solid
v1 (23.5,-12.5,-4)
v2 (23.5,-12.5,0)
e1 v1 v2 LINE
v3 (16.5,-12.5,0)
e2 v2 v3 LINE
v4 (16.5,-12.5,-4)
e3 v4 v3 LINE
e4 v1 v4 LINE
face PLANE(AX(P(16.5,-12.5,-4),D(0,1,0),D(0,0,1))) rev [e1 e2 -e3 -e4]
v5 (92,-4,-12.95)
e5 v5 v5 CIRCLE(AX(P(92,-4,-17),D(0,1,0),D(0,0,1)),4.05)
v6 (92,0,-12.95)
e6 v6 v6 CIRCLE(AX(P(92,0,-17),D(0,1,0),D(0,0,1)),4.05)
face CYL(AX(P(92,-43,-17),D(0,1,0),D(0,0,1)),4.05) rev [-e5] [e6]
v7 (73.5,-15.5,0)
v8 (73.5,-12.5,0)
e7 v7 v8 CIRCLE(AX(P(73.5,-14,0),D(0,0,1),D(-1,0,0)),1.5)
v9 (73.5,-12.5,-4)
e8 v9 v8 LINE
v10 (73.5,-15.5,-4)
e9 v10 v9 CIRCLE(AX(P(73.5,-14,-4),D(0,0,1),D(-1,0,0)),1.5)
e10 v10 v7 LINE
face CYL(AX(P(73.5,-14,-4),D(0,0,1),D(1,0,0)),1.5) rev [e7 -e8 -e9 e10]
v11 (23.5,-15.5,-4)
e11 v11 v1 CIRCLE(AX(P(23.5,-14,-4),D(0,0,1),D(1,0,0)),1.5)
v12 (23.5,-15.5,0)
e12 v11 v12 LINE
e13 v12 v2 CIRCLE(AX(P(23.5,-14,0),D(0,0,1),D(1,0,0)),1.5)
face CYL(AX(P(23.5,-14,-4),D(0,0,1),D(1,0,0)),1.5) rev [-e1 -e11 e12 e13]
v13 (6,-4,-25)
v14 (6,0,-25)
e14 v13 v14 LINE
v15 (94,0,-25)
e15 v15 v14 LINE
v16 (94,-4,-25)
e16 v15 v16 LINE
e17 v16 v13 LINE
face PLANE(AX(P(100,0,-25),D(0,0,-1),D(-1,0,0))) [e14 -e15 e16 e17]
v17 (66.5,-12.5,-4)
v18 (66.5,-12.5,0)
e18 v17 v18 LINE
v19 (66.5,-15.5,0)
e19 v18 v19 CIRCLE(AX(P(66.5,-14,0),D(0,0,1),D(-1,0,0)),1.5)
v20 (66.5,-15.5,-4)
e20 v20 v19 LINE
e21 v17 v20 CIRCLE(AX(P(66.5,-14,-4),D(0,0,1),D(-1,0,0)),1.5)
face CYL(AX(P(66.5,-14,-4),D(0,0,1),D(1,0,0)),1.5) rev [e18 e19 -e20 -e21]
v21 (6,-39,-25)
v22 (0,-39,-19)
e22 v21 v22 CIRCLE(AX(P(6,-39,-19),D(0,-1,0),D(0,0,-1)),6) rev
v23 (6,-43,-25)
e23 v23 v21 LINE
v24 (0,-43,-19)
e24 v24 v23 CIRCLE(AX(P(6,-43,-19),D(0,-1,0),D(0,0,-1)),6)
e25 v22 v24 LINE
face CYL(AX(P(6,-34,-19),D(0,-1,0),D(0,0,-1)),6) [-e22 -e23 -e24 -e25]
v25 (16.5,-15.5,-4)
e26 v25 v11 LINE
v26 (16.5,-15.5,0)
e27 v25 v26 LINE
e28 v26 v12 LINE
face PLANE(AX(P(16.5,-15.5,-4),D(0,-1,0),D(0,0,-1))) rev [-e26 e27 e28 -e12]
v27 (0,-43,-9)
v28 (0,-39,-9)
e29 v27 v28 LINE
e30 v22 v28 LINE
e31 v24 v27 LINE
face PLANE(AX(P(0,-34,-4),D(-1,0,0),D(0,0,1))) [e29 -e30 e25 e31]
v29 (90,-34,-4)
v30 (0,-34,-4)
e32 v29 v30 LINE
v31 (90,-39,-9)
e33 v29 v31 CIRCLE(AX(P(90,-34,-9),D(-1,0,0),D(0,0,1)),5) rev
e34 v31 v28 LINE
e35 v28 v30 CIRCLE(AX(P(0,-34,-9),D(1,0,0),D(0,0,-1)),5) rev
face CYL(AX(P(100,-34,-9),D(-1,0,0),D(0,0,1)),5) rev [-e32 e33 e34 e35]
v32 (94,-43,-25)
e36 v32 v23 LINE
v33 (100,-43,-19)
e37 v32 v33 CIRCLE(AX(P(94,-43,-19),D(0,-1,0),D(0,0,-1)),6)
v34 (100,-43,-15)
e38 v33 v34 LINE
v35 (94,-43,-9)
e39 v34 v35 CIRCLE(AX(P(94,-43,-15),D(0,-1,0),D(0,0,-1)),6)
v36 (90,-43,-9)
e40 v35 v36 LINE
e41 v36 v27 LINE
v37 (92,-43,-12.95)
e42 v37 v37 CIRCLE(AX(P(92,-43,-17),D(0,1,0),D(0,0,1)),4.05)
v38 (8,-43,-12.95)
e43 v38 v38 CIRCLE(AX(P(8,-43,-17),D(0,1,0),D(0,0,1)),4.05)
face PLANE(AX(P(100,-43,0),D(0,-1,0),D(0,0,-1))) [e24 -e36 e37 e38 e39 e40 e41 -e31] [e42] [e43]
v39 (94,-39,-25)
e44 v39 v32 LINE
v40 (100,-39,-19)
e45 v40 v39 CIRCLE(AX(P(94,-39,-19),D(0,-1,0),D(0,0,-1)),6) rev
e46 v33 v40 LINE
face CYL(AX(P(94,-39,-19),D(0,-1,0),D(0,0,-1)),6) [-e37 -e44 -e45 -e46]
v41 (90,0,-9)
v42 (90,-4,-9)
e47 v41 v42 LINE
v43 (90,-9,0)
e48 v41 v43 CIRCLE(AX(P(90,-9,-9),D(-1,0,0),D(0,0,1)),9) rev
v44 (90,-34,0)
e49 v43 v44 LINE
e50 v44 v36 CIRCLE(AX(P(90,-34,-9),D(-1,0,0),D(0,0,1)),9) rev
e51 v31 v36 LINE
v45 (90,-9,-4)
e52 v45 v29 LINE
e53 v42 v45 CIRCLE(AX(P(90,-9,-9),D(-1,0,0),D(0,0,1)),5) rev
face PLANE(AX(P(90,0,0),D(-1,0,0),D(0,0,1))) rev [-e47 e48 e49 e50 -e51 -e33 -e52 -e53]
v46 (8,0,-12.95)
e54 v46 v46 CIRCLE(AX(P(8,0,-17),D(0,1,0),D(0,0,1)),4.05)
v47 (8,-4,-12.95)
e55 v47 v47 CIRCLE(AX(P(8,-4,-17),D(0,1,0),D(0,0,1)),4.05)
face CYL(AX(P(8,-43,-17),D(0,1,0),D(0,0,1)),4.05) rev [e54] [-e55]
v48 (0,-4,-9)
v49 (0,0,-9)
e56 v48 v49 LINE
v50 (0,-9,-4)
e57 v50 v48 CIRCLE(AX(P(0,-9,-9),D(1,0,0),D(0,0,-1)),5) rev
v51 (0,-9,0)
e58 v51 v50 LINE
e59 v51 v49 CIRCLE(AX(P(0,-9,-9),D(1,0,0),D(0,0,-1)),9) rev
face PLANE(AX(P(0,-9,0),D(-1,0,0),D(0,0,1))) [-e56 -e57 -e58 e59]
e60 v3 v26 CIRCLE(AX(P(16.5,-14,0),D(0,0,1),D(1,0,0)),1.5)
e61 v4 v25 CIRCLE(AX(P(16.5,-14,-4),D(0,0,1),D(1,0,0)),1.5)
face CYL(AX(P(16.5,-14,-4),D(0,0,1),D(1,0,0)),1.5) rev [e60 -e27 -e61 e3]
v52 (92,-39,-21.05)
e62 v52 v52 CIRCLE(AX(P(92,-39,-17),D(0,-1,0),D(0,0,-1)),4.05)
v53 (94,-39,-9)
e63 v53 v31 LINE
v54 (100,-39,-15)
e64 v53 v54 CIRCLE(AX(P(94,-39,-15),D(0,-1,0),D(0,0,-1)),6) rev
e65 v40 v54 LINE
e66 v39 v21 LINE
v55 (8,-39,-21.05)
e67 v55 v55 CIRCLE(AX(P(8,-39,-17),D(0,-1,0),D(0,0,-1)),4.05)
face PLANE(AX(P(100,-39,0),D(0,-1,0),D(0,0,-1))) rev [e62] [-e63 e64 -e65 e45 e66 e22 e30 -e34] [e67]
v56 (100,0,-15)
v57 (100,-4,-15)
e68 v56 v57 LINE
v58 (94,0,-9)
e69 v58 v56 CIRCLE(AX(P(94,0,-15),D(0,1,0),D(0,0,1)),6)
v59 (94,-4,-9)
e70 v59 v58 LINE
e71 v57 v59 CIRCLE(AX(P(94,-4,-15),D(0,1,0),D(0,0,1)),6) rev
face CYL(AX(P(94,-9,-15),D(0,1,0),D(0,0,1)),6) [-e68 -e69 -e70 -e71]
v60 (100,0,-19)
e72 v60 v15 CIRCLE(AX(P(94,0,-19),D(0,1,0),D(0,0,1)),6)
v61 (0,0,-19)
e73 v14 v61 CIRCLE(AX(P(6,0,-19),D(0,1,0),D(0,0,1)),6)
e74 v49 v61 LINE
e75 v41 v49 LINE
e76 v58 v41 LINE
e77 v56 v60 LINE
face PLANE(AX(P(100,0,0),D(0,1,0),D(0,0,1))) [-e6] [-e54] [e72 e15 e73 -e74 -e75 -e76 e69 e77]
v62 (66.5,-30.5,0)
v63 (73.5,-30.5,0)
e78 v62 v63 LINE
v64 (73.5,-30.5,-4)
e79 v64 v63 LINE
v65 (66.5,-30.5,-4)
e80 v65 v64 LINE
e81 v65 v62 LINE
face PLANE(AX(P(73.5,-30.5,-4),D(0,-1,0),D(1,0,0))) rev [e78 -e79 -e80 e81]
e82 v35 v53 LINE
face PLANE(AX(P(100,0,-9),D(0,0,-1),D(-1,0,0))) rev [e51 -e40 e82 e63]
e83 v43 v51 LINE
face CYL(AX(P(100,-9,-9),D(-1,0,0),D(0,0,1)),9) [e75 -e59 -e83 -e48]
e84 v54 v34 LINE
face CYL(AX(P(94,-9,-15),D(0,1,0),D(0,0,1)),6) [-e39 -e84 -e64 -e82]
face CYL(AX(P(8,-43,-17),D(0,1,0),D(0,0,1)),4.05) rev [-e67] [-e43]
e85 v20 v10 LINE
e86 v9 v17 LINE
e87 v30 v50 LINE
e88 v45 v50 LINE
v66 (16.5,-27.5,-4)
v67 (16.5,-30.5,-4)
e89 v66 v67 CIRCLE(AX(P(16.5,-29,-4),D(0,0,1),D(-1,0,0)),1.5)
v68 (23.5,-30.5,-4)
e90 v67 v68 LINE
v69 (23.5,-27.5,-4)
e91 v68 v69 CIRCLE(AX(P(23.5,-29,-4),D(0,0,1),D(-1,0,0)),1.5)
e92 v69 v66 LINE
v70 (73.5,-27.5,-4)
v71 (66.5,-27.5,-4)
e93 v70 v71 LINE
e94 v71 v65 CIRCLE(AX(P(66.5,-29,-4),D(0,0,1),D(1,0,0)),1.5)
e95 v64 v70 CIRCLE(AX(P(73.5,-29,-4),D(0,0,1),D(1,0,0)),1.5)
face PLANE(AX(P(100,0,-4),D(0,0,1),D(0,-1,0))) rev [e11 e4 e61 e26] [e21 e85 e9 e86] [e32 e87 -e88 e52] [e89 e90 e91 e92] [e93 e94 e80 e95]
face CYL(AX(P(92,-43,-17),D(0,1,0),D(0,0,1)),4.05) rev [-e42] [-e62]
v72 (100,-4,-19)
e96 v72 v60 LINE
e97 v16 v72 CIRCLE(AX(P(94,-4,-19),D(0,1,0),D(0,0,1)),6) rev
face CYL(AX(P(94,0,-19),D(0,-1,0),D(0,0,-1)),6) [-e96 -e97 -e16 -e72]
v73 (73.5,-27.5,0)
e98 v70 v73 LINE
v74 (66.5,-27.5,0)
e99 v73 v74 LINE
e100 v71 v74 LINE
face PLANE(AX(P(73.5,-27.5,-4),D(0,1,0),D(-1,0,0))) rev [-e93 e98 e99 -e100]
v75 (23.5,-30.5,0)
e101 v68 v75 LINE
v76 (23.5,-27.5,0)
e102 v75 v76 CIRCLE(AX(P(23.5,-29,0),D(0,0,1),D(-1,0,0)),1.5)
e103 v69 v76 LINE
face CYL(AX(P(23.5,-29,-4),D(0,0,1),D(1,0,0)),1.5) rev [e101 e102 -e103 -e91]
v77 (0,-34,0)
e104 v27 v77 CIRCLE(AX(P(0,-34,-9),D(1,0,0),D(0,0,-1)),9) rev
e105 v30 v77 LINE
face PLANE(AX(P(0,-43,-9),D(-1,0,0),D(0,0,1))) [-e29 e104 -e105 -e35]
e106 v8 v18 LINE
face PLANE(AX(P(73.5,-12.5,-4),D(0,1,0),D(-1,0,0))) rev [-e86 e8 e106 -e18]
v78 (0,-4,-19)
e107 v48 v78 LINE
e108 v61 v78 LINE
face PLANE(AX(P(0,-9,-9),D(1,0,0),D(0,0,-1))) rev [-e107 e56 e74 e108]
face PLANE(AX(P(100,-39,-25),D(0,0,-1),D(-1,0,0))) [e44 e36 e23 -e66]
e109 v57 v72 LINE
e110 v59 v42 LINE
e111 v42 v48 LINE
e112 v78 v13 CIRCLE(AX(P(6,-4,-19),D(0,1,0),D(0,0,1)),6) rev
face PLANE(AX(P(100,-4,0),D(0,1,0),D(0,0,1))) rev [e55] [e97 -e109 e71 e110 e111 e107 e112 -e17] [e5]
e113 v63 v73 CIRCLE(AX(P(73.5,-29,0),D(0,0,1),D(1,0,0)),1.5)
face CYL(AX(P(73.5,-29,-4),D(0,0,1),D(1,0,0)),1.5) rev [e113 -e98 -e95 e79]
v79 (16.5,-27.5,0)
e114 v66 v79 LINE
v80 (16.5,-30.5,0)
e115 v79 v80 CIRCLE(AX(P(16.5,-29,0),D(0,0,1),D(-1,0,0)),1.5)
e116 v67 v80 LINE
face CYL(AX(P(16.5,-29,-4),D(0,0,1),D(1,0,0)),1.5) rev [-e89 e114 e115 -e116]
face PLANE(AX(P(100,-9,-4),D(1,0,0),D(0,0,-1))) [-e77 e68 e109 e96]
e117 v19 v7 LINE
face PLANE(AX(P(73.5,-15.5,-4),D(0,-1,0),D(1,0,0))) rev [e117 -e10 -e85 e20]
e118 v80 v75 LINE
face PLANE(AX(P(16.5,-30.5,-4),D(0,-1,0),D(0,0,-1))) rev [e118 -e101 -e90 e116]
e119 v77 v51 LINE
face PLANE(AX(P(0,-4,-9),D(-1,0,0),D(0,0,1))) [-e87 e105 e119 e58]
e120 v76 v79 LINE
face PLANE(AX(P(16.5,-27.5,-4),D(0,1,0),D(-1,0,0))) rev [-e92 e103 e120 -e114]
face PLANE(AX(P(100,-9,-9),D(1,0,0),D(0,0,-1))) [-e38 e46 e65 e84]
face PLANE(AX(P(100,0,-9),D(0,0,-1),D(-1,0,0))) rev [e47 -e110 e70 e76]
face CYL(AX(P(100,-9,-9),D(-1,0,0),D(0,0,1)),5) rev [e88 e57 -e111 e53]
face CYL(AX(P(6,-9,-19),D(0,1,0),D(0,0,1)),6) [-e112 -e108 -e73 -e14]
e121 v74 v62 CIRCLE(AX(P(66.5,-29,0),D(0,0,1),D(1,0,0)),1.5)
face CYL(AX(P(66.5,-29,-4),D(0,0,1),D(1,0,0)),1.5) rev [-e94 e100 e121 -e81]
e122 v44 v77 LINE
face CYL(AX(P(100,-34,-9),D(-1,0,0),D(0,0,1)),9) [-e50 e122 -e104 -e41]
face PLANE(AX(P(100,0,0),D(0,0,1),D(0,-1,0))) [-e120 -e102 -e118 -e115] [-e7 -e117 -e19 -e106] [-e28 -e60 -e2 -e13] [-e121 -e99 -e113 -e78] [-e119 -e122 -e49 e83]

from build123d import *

# Parameters (mm, degrees)
SM_BASE_FLANGE_1_DEPTH = 100
SKETCH_4_R             = 4.05
CUT_EXTRUDE_1_DEPTH    = 112.687062814
SKETCH_5_W             = 10
SKETCH_5_H             = 9
CUT_EXTRUDE_2_DEPTH    = 112.687062814
FILLET_1_R             = 6
CUT_EXTRUDE_3_DEPTH    = 4


# Sheet-metal steps are written as plain solids
with BuildPart() as part:
    # Sketch 1 → Базовая кромка1 (new body)
    with BuildSketch(Plane(origin=(0, 0, 0), x_dir=(0, 0, -1), z_dir=(1, 0, 0))):
        with BuildLine():
            Line((25, -43), (9, -43))
            ThreePointArc((9, -43), (2.636038969, -40.363961031), (0, -34))
            Line((0, -34), (0, -9))
            ThreePointArc((0, -9), (2.636038969, -2.636038969), (9, 0))
            Line((9, 0), (25, 0))
            Line((25, 0), (25, -4))
            Line((25, -4), (9, -4))
            ThreePointArc((9, -4), (5.464466094, -5.464466094), (4, -9))
            Line((4, -9), (4, -34))
            ThreePointArc((4, -34), (5.464466094, -37.535533906), (9, -39))
            Line((9, -39), (25, -39))
            Line((25, -39), (25, -43))
        make_face()
    extrude(amount=SM_BASE_FLANGE_1_DEPTH)

    # Эскиз4 → Вырез-Вытянуть1 (cut, through all)
    with BuildSketch(Plane(origin=(0, 0, 0), x_dir=(1, 0, 0), z_dir=(0, 1, 0))):
        with Locations(Location((8, 17, 0), (0, 0, 270))):
            Circle(SKETCH_4_R)
        with Locations(Location((92, 17, 0), (0, 0, 270))):
            Circle(SKETCH_4_R)
    extrude(amount=-CUT_EXTRUDE_1_DEPTH, mode=Mode.SUBTRACT)

    # Эскиз5 → Вырез-Вытянуть2 (cut, through all)
    with BuildSketch(Plane.XZ.offset(43)):
        with Locations((95, -4.5)):
            Rectangle(SKETCH_5_W, SKETCH_5_H)
    extrude(amount=-CUT_EXTRUDE_2_DEPTH, mode=Mode.SUBTRACT)

    # Скругление1
    fillet_1_edges = [part.edges().sort_by_distance(p)[0] for p in [
        (0, -41, -25),
        (0, -2, -25),
        (100, -41, -25),
        (100, -2, -9),
        (100, -41, -9),
        (100, -2, -25),
    ]]
    fillet(fillet_1_edges, radius=FILLET_1_R)

    # Эскиз6 → Вырез-Вытянуть3 (cut)
    with BuildSketch(Plane.XY):
        with BuildLine():
            Line((16.5, -12.5), (23.5, -12.5))
            ThreePointArc((23.5, -12.5), (25, -14), (23.5, -15.5))
            Line((23.5, -15.5), (16.5, -15.5))
            ThreePointArc((16.5, -15.5), (15, -14), (16.5, -12.5))
        make_face()
        with BuildLine():
            Line((73.5, -12.5), (66.5, -12.5))
            ThreePointArc((66.5, -12.5), (65, -14), (66.5, -15.5))
            Line((66.5, -15.5), (73.5, -15.5))
            ThreePointArc((73.5, -15.5), (75, -14), (73.5, -12.5))
        make_face()
        with BuildLine():
            Line((73.5, -30.5), (66.5, -30.5))
            ThreePointArc((66.5, -30.5), (65, -29), (66.5, -27.5))
            Line((66.5, -27.5), (73.5, -27.5))
            ThreePointArc((73.5, -27.5), (75, -29), (73.5, -30.5))
        make_face()
        with BuildLine():
            Line((16.5, -30.5), (23.5, -30.5))
            ThreePointArc((23.5, -30.5), (25, -29), (23.5, -27.5))
            Line((23.5, -27.5), (16.5, -27.5))
            ThreePointArc((16.5, -27.5), (15, -29), (16.5, -30.5))
        make_face()
    extrude(amount=-CUT_EXTRUDE_3_DEPTH, mode=Mode.SUBTRACT)


solid = part.part
